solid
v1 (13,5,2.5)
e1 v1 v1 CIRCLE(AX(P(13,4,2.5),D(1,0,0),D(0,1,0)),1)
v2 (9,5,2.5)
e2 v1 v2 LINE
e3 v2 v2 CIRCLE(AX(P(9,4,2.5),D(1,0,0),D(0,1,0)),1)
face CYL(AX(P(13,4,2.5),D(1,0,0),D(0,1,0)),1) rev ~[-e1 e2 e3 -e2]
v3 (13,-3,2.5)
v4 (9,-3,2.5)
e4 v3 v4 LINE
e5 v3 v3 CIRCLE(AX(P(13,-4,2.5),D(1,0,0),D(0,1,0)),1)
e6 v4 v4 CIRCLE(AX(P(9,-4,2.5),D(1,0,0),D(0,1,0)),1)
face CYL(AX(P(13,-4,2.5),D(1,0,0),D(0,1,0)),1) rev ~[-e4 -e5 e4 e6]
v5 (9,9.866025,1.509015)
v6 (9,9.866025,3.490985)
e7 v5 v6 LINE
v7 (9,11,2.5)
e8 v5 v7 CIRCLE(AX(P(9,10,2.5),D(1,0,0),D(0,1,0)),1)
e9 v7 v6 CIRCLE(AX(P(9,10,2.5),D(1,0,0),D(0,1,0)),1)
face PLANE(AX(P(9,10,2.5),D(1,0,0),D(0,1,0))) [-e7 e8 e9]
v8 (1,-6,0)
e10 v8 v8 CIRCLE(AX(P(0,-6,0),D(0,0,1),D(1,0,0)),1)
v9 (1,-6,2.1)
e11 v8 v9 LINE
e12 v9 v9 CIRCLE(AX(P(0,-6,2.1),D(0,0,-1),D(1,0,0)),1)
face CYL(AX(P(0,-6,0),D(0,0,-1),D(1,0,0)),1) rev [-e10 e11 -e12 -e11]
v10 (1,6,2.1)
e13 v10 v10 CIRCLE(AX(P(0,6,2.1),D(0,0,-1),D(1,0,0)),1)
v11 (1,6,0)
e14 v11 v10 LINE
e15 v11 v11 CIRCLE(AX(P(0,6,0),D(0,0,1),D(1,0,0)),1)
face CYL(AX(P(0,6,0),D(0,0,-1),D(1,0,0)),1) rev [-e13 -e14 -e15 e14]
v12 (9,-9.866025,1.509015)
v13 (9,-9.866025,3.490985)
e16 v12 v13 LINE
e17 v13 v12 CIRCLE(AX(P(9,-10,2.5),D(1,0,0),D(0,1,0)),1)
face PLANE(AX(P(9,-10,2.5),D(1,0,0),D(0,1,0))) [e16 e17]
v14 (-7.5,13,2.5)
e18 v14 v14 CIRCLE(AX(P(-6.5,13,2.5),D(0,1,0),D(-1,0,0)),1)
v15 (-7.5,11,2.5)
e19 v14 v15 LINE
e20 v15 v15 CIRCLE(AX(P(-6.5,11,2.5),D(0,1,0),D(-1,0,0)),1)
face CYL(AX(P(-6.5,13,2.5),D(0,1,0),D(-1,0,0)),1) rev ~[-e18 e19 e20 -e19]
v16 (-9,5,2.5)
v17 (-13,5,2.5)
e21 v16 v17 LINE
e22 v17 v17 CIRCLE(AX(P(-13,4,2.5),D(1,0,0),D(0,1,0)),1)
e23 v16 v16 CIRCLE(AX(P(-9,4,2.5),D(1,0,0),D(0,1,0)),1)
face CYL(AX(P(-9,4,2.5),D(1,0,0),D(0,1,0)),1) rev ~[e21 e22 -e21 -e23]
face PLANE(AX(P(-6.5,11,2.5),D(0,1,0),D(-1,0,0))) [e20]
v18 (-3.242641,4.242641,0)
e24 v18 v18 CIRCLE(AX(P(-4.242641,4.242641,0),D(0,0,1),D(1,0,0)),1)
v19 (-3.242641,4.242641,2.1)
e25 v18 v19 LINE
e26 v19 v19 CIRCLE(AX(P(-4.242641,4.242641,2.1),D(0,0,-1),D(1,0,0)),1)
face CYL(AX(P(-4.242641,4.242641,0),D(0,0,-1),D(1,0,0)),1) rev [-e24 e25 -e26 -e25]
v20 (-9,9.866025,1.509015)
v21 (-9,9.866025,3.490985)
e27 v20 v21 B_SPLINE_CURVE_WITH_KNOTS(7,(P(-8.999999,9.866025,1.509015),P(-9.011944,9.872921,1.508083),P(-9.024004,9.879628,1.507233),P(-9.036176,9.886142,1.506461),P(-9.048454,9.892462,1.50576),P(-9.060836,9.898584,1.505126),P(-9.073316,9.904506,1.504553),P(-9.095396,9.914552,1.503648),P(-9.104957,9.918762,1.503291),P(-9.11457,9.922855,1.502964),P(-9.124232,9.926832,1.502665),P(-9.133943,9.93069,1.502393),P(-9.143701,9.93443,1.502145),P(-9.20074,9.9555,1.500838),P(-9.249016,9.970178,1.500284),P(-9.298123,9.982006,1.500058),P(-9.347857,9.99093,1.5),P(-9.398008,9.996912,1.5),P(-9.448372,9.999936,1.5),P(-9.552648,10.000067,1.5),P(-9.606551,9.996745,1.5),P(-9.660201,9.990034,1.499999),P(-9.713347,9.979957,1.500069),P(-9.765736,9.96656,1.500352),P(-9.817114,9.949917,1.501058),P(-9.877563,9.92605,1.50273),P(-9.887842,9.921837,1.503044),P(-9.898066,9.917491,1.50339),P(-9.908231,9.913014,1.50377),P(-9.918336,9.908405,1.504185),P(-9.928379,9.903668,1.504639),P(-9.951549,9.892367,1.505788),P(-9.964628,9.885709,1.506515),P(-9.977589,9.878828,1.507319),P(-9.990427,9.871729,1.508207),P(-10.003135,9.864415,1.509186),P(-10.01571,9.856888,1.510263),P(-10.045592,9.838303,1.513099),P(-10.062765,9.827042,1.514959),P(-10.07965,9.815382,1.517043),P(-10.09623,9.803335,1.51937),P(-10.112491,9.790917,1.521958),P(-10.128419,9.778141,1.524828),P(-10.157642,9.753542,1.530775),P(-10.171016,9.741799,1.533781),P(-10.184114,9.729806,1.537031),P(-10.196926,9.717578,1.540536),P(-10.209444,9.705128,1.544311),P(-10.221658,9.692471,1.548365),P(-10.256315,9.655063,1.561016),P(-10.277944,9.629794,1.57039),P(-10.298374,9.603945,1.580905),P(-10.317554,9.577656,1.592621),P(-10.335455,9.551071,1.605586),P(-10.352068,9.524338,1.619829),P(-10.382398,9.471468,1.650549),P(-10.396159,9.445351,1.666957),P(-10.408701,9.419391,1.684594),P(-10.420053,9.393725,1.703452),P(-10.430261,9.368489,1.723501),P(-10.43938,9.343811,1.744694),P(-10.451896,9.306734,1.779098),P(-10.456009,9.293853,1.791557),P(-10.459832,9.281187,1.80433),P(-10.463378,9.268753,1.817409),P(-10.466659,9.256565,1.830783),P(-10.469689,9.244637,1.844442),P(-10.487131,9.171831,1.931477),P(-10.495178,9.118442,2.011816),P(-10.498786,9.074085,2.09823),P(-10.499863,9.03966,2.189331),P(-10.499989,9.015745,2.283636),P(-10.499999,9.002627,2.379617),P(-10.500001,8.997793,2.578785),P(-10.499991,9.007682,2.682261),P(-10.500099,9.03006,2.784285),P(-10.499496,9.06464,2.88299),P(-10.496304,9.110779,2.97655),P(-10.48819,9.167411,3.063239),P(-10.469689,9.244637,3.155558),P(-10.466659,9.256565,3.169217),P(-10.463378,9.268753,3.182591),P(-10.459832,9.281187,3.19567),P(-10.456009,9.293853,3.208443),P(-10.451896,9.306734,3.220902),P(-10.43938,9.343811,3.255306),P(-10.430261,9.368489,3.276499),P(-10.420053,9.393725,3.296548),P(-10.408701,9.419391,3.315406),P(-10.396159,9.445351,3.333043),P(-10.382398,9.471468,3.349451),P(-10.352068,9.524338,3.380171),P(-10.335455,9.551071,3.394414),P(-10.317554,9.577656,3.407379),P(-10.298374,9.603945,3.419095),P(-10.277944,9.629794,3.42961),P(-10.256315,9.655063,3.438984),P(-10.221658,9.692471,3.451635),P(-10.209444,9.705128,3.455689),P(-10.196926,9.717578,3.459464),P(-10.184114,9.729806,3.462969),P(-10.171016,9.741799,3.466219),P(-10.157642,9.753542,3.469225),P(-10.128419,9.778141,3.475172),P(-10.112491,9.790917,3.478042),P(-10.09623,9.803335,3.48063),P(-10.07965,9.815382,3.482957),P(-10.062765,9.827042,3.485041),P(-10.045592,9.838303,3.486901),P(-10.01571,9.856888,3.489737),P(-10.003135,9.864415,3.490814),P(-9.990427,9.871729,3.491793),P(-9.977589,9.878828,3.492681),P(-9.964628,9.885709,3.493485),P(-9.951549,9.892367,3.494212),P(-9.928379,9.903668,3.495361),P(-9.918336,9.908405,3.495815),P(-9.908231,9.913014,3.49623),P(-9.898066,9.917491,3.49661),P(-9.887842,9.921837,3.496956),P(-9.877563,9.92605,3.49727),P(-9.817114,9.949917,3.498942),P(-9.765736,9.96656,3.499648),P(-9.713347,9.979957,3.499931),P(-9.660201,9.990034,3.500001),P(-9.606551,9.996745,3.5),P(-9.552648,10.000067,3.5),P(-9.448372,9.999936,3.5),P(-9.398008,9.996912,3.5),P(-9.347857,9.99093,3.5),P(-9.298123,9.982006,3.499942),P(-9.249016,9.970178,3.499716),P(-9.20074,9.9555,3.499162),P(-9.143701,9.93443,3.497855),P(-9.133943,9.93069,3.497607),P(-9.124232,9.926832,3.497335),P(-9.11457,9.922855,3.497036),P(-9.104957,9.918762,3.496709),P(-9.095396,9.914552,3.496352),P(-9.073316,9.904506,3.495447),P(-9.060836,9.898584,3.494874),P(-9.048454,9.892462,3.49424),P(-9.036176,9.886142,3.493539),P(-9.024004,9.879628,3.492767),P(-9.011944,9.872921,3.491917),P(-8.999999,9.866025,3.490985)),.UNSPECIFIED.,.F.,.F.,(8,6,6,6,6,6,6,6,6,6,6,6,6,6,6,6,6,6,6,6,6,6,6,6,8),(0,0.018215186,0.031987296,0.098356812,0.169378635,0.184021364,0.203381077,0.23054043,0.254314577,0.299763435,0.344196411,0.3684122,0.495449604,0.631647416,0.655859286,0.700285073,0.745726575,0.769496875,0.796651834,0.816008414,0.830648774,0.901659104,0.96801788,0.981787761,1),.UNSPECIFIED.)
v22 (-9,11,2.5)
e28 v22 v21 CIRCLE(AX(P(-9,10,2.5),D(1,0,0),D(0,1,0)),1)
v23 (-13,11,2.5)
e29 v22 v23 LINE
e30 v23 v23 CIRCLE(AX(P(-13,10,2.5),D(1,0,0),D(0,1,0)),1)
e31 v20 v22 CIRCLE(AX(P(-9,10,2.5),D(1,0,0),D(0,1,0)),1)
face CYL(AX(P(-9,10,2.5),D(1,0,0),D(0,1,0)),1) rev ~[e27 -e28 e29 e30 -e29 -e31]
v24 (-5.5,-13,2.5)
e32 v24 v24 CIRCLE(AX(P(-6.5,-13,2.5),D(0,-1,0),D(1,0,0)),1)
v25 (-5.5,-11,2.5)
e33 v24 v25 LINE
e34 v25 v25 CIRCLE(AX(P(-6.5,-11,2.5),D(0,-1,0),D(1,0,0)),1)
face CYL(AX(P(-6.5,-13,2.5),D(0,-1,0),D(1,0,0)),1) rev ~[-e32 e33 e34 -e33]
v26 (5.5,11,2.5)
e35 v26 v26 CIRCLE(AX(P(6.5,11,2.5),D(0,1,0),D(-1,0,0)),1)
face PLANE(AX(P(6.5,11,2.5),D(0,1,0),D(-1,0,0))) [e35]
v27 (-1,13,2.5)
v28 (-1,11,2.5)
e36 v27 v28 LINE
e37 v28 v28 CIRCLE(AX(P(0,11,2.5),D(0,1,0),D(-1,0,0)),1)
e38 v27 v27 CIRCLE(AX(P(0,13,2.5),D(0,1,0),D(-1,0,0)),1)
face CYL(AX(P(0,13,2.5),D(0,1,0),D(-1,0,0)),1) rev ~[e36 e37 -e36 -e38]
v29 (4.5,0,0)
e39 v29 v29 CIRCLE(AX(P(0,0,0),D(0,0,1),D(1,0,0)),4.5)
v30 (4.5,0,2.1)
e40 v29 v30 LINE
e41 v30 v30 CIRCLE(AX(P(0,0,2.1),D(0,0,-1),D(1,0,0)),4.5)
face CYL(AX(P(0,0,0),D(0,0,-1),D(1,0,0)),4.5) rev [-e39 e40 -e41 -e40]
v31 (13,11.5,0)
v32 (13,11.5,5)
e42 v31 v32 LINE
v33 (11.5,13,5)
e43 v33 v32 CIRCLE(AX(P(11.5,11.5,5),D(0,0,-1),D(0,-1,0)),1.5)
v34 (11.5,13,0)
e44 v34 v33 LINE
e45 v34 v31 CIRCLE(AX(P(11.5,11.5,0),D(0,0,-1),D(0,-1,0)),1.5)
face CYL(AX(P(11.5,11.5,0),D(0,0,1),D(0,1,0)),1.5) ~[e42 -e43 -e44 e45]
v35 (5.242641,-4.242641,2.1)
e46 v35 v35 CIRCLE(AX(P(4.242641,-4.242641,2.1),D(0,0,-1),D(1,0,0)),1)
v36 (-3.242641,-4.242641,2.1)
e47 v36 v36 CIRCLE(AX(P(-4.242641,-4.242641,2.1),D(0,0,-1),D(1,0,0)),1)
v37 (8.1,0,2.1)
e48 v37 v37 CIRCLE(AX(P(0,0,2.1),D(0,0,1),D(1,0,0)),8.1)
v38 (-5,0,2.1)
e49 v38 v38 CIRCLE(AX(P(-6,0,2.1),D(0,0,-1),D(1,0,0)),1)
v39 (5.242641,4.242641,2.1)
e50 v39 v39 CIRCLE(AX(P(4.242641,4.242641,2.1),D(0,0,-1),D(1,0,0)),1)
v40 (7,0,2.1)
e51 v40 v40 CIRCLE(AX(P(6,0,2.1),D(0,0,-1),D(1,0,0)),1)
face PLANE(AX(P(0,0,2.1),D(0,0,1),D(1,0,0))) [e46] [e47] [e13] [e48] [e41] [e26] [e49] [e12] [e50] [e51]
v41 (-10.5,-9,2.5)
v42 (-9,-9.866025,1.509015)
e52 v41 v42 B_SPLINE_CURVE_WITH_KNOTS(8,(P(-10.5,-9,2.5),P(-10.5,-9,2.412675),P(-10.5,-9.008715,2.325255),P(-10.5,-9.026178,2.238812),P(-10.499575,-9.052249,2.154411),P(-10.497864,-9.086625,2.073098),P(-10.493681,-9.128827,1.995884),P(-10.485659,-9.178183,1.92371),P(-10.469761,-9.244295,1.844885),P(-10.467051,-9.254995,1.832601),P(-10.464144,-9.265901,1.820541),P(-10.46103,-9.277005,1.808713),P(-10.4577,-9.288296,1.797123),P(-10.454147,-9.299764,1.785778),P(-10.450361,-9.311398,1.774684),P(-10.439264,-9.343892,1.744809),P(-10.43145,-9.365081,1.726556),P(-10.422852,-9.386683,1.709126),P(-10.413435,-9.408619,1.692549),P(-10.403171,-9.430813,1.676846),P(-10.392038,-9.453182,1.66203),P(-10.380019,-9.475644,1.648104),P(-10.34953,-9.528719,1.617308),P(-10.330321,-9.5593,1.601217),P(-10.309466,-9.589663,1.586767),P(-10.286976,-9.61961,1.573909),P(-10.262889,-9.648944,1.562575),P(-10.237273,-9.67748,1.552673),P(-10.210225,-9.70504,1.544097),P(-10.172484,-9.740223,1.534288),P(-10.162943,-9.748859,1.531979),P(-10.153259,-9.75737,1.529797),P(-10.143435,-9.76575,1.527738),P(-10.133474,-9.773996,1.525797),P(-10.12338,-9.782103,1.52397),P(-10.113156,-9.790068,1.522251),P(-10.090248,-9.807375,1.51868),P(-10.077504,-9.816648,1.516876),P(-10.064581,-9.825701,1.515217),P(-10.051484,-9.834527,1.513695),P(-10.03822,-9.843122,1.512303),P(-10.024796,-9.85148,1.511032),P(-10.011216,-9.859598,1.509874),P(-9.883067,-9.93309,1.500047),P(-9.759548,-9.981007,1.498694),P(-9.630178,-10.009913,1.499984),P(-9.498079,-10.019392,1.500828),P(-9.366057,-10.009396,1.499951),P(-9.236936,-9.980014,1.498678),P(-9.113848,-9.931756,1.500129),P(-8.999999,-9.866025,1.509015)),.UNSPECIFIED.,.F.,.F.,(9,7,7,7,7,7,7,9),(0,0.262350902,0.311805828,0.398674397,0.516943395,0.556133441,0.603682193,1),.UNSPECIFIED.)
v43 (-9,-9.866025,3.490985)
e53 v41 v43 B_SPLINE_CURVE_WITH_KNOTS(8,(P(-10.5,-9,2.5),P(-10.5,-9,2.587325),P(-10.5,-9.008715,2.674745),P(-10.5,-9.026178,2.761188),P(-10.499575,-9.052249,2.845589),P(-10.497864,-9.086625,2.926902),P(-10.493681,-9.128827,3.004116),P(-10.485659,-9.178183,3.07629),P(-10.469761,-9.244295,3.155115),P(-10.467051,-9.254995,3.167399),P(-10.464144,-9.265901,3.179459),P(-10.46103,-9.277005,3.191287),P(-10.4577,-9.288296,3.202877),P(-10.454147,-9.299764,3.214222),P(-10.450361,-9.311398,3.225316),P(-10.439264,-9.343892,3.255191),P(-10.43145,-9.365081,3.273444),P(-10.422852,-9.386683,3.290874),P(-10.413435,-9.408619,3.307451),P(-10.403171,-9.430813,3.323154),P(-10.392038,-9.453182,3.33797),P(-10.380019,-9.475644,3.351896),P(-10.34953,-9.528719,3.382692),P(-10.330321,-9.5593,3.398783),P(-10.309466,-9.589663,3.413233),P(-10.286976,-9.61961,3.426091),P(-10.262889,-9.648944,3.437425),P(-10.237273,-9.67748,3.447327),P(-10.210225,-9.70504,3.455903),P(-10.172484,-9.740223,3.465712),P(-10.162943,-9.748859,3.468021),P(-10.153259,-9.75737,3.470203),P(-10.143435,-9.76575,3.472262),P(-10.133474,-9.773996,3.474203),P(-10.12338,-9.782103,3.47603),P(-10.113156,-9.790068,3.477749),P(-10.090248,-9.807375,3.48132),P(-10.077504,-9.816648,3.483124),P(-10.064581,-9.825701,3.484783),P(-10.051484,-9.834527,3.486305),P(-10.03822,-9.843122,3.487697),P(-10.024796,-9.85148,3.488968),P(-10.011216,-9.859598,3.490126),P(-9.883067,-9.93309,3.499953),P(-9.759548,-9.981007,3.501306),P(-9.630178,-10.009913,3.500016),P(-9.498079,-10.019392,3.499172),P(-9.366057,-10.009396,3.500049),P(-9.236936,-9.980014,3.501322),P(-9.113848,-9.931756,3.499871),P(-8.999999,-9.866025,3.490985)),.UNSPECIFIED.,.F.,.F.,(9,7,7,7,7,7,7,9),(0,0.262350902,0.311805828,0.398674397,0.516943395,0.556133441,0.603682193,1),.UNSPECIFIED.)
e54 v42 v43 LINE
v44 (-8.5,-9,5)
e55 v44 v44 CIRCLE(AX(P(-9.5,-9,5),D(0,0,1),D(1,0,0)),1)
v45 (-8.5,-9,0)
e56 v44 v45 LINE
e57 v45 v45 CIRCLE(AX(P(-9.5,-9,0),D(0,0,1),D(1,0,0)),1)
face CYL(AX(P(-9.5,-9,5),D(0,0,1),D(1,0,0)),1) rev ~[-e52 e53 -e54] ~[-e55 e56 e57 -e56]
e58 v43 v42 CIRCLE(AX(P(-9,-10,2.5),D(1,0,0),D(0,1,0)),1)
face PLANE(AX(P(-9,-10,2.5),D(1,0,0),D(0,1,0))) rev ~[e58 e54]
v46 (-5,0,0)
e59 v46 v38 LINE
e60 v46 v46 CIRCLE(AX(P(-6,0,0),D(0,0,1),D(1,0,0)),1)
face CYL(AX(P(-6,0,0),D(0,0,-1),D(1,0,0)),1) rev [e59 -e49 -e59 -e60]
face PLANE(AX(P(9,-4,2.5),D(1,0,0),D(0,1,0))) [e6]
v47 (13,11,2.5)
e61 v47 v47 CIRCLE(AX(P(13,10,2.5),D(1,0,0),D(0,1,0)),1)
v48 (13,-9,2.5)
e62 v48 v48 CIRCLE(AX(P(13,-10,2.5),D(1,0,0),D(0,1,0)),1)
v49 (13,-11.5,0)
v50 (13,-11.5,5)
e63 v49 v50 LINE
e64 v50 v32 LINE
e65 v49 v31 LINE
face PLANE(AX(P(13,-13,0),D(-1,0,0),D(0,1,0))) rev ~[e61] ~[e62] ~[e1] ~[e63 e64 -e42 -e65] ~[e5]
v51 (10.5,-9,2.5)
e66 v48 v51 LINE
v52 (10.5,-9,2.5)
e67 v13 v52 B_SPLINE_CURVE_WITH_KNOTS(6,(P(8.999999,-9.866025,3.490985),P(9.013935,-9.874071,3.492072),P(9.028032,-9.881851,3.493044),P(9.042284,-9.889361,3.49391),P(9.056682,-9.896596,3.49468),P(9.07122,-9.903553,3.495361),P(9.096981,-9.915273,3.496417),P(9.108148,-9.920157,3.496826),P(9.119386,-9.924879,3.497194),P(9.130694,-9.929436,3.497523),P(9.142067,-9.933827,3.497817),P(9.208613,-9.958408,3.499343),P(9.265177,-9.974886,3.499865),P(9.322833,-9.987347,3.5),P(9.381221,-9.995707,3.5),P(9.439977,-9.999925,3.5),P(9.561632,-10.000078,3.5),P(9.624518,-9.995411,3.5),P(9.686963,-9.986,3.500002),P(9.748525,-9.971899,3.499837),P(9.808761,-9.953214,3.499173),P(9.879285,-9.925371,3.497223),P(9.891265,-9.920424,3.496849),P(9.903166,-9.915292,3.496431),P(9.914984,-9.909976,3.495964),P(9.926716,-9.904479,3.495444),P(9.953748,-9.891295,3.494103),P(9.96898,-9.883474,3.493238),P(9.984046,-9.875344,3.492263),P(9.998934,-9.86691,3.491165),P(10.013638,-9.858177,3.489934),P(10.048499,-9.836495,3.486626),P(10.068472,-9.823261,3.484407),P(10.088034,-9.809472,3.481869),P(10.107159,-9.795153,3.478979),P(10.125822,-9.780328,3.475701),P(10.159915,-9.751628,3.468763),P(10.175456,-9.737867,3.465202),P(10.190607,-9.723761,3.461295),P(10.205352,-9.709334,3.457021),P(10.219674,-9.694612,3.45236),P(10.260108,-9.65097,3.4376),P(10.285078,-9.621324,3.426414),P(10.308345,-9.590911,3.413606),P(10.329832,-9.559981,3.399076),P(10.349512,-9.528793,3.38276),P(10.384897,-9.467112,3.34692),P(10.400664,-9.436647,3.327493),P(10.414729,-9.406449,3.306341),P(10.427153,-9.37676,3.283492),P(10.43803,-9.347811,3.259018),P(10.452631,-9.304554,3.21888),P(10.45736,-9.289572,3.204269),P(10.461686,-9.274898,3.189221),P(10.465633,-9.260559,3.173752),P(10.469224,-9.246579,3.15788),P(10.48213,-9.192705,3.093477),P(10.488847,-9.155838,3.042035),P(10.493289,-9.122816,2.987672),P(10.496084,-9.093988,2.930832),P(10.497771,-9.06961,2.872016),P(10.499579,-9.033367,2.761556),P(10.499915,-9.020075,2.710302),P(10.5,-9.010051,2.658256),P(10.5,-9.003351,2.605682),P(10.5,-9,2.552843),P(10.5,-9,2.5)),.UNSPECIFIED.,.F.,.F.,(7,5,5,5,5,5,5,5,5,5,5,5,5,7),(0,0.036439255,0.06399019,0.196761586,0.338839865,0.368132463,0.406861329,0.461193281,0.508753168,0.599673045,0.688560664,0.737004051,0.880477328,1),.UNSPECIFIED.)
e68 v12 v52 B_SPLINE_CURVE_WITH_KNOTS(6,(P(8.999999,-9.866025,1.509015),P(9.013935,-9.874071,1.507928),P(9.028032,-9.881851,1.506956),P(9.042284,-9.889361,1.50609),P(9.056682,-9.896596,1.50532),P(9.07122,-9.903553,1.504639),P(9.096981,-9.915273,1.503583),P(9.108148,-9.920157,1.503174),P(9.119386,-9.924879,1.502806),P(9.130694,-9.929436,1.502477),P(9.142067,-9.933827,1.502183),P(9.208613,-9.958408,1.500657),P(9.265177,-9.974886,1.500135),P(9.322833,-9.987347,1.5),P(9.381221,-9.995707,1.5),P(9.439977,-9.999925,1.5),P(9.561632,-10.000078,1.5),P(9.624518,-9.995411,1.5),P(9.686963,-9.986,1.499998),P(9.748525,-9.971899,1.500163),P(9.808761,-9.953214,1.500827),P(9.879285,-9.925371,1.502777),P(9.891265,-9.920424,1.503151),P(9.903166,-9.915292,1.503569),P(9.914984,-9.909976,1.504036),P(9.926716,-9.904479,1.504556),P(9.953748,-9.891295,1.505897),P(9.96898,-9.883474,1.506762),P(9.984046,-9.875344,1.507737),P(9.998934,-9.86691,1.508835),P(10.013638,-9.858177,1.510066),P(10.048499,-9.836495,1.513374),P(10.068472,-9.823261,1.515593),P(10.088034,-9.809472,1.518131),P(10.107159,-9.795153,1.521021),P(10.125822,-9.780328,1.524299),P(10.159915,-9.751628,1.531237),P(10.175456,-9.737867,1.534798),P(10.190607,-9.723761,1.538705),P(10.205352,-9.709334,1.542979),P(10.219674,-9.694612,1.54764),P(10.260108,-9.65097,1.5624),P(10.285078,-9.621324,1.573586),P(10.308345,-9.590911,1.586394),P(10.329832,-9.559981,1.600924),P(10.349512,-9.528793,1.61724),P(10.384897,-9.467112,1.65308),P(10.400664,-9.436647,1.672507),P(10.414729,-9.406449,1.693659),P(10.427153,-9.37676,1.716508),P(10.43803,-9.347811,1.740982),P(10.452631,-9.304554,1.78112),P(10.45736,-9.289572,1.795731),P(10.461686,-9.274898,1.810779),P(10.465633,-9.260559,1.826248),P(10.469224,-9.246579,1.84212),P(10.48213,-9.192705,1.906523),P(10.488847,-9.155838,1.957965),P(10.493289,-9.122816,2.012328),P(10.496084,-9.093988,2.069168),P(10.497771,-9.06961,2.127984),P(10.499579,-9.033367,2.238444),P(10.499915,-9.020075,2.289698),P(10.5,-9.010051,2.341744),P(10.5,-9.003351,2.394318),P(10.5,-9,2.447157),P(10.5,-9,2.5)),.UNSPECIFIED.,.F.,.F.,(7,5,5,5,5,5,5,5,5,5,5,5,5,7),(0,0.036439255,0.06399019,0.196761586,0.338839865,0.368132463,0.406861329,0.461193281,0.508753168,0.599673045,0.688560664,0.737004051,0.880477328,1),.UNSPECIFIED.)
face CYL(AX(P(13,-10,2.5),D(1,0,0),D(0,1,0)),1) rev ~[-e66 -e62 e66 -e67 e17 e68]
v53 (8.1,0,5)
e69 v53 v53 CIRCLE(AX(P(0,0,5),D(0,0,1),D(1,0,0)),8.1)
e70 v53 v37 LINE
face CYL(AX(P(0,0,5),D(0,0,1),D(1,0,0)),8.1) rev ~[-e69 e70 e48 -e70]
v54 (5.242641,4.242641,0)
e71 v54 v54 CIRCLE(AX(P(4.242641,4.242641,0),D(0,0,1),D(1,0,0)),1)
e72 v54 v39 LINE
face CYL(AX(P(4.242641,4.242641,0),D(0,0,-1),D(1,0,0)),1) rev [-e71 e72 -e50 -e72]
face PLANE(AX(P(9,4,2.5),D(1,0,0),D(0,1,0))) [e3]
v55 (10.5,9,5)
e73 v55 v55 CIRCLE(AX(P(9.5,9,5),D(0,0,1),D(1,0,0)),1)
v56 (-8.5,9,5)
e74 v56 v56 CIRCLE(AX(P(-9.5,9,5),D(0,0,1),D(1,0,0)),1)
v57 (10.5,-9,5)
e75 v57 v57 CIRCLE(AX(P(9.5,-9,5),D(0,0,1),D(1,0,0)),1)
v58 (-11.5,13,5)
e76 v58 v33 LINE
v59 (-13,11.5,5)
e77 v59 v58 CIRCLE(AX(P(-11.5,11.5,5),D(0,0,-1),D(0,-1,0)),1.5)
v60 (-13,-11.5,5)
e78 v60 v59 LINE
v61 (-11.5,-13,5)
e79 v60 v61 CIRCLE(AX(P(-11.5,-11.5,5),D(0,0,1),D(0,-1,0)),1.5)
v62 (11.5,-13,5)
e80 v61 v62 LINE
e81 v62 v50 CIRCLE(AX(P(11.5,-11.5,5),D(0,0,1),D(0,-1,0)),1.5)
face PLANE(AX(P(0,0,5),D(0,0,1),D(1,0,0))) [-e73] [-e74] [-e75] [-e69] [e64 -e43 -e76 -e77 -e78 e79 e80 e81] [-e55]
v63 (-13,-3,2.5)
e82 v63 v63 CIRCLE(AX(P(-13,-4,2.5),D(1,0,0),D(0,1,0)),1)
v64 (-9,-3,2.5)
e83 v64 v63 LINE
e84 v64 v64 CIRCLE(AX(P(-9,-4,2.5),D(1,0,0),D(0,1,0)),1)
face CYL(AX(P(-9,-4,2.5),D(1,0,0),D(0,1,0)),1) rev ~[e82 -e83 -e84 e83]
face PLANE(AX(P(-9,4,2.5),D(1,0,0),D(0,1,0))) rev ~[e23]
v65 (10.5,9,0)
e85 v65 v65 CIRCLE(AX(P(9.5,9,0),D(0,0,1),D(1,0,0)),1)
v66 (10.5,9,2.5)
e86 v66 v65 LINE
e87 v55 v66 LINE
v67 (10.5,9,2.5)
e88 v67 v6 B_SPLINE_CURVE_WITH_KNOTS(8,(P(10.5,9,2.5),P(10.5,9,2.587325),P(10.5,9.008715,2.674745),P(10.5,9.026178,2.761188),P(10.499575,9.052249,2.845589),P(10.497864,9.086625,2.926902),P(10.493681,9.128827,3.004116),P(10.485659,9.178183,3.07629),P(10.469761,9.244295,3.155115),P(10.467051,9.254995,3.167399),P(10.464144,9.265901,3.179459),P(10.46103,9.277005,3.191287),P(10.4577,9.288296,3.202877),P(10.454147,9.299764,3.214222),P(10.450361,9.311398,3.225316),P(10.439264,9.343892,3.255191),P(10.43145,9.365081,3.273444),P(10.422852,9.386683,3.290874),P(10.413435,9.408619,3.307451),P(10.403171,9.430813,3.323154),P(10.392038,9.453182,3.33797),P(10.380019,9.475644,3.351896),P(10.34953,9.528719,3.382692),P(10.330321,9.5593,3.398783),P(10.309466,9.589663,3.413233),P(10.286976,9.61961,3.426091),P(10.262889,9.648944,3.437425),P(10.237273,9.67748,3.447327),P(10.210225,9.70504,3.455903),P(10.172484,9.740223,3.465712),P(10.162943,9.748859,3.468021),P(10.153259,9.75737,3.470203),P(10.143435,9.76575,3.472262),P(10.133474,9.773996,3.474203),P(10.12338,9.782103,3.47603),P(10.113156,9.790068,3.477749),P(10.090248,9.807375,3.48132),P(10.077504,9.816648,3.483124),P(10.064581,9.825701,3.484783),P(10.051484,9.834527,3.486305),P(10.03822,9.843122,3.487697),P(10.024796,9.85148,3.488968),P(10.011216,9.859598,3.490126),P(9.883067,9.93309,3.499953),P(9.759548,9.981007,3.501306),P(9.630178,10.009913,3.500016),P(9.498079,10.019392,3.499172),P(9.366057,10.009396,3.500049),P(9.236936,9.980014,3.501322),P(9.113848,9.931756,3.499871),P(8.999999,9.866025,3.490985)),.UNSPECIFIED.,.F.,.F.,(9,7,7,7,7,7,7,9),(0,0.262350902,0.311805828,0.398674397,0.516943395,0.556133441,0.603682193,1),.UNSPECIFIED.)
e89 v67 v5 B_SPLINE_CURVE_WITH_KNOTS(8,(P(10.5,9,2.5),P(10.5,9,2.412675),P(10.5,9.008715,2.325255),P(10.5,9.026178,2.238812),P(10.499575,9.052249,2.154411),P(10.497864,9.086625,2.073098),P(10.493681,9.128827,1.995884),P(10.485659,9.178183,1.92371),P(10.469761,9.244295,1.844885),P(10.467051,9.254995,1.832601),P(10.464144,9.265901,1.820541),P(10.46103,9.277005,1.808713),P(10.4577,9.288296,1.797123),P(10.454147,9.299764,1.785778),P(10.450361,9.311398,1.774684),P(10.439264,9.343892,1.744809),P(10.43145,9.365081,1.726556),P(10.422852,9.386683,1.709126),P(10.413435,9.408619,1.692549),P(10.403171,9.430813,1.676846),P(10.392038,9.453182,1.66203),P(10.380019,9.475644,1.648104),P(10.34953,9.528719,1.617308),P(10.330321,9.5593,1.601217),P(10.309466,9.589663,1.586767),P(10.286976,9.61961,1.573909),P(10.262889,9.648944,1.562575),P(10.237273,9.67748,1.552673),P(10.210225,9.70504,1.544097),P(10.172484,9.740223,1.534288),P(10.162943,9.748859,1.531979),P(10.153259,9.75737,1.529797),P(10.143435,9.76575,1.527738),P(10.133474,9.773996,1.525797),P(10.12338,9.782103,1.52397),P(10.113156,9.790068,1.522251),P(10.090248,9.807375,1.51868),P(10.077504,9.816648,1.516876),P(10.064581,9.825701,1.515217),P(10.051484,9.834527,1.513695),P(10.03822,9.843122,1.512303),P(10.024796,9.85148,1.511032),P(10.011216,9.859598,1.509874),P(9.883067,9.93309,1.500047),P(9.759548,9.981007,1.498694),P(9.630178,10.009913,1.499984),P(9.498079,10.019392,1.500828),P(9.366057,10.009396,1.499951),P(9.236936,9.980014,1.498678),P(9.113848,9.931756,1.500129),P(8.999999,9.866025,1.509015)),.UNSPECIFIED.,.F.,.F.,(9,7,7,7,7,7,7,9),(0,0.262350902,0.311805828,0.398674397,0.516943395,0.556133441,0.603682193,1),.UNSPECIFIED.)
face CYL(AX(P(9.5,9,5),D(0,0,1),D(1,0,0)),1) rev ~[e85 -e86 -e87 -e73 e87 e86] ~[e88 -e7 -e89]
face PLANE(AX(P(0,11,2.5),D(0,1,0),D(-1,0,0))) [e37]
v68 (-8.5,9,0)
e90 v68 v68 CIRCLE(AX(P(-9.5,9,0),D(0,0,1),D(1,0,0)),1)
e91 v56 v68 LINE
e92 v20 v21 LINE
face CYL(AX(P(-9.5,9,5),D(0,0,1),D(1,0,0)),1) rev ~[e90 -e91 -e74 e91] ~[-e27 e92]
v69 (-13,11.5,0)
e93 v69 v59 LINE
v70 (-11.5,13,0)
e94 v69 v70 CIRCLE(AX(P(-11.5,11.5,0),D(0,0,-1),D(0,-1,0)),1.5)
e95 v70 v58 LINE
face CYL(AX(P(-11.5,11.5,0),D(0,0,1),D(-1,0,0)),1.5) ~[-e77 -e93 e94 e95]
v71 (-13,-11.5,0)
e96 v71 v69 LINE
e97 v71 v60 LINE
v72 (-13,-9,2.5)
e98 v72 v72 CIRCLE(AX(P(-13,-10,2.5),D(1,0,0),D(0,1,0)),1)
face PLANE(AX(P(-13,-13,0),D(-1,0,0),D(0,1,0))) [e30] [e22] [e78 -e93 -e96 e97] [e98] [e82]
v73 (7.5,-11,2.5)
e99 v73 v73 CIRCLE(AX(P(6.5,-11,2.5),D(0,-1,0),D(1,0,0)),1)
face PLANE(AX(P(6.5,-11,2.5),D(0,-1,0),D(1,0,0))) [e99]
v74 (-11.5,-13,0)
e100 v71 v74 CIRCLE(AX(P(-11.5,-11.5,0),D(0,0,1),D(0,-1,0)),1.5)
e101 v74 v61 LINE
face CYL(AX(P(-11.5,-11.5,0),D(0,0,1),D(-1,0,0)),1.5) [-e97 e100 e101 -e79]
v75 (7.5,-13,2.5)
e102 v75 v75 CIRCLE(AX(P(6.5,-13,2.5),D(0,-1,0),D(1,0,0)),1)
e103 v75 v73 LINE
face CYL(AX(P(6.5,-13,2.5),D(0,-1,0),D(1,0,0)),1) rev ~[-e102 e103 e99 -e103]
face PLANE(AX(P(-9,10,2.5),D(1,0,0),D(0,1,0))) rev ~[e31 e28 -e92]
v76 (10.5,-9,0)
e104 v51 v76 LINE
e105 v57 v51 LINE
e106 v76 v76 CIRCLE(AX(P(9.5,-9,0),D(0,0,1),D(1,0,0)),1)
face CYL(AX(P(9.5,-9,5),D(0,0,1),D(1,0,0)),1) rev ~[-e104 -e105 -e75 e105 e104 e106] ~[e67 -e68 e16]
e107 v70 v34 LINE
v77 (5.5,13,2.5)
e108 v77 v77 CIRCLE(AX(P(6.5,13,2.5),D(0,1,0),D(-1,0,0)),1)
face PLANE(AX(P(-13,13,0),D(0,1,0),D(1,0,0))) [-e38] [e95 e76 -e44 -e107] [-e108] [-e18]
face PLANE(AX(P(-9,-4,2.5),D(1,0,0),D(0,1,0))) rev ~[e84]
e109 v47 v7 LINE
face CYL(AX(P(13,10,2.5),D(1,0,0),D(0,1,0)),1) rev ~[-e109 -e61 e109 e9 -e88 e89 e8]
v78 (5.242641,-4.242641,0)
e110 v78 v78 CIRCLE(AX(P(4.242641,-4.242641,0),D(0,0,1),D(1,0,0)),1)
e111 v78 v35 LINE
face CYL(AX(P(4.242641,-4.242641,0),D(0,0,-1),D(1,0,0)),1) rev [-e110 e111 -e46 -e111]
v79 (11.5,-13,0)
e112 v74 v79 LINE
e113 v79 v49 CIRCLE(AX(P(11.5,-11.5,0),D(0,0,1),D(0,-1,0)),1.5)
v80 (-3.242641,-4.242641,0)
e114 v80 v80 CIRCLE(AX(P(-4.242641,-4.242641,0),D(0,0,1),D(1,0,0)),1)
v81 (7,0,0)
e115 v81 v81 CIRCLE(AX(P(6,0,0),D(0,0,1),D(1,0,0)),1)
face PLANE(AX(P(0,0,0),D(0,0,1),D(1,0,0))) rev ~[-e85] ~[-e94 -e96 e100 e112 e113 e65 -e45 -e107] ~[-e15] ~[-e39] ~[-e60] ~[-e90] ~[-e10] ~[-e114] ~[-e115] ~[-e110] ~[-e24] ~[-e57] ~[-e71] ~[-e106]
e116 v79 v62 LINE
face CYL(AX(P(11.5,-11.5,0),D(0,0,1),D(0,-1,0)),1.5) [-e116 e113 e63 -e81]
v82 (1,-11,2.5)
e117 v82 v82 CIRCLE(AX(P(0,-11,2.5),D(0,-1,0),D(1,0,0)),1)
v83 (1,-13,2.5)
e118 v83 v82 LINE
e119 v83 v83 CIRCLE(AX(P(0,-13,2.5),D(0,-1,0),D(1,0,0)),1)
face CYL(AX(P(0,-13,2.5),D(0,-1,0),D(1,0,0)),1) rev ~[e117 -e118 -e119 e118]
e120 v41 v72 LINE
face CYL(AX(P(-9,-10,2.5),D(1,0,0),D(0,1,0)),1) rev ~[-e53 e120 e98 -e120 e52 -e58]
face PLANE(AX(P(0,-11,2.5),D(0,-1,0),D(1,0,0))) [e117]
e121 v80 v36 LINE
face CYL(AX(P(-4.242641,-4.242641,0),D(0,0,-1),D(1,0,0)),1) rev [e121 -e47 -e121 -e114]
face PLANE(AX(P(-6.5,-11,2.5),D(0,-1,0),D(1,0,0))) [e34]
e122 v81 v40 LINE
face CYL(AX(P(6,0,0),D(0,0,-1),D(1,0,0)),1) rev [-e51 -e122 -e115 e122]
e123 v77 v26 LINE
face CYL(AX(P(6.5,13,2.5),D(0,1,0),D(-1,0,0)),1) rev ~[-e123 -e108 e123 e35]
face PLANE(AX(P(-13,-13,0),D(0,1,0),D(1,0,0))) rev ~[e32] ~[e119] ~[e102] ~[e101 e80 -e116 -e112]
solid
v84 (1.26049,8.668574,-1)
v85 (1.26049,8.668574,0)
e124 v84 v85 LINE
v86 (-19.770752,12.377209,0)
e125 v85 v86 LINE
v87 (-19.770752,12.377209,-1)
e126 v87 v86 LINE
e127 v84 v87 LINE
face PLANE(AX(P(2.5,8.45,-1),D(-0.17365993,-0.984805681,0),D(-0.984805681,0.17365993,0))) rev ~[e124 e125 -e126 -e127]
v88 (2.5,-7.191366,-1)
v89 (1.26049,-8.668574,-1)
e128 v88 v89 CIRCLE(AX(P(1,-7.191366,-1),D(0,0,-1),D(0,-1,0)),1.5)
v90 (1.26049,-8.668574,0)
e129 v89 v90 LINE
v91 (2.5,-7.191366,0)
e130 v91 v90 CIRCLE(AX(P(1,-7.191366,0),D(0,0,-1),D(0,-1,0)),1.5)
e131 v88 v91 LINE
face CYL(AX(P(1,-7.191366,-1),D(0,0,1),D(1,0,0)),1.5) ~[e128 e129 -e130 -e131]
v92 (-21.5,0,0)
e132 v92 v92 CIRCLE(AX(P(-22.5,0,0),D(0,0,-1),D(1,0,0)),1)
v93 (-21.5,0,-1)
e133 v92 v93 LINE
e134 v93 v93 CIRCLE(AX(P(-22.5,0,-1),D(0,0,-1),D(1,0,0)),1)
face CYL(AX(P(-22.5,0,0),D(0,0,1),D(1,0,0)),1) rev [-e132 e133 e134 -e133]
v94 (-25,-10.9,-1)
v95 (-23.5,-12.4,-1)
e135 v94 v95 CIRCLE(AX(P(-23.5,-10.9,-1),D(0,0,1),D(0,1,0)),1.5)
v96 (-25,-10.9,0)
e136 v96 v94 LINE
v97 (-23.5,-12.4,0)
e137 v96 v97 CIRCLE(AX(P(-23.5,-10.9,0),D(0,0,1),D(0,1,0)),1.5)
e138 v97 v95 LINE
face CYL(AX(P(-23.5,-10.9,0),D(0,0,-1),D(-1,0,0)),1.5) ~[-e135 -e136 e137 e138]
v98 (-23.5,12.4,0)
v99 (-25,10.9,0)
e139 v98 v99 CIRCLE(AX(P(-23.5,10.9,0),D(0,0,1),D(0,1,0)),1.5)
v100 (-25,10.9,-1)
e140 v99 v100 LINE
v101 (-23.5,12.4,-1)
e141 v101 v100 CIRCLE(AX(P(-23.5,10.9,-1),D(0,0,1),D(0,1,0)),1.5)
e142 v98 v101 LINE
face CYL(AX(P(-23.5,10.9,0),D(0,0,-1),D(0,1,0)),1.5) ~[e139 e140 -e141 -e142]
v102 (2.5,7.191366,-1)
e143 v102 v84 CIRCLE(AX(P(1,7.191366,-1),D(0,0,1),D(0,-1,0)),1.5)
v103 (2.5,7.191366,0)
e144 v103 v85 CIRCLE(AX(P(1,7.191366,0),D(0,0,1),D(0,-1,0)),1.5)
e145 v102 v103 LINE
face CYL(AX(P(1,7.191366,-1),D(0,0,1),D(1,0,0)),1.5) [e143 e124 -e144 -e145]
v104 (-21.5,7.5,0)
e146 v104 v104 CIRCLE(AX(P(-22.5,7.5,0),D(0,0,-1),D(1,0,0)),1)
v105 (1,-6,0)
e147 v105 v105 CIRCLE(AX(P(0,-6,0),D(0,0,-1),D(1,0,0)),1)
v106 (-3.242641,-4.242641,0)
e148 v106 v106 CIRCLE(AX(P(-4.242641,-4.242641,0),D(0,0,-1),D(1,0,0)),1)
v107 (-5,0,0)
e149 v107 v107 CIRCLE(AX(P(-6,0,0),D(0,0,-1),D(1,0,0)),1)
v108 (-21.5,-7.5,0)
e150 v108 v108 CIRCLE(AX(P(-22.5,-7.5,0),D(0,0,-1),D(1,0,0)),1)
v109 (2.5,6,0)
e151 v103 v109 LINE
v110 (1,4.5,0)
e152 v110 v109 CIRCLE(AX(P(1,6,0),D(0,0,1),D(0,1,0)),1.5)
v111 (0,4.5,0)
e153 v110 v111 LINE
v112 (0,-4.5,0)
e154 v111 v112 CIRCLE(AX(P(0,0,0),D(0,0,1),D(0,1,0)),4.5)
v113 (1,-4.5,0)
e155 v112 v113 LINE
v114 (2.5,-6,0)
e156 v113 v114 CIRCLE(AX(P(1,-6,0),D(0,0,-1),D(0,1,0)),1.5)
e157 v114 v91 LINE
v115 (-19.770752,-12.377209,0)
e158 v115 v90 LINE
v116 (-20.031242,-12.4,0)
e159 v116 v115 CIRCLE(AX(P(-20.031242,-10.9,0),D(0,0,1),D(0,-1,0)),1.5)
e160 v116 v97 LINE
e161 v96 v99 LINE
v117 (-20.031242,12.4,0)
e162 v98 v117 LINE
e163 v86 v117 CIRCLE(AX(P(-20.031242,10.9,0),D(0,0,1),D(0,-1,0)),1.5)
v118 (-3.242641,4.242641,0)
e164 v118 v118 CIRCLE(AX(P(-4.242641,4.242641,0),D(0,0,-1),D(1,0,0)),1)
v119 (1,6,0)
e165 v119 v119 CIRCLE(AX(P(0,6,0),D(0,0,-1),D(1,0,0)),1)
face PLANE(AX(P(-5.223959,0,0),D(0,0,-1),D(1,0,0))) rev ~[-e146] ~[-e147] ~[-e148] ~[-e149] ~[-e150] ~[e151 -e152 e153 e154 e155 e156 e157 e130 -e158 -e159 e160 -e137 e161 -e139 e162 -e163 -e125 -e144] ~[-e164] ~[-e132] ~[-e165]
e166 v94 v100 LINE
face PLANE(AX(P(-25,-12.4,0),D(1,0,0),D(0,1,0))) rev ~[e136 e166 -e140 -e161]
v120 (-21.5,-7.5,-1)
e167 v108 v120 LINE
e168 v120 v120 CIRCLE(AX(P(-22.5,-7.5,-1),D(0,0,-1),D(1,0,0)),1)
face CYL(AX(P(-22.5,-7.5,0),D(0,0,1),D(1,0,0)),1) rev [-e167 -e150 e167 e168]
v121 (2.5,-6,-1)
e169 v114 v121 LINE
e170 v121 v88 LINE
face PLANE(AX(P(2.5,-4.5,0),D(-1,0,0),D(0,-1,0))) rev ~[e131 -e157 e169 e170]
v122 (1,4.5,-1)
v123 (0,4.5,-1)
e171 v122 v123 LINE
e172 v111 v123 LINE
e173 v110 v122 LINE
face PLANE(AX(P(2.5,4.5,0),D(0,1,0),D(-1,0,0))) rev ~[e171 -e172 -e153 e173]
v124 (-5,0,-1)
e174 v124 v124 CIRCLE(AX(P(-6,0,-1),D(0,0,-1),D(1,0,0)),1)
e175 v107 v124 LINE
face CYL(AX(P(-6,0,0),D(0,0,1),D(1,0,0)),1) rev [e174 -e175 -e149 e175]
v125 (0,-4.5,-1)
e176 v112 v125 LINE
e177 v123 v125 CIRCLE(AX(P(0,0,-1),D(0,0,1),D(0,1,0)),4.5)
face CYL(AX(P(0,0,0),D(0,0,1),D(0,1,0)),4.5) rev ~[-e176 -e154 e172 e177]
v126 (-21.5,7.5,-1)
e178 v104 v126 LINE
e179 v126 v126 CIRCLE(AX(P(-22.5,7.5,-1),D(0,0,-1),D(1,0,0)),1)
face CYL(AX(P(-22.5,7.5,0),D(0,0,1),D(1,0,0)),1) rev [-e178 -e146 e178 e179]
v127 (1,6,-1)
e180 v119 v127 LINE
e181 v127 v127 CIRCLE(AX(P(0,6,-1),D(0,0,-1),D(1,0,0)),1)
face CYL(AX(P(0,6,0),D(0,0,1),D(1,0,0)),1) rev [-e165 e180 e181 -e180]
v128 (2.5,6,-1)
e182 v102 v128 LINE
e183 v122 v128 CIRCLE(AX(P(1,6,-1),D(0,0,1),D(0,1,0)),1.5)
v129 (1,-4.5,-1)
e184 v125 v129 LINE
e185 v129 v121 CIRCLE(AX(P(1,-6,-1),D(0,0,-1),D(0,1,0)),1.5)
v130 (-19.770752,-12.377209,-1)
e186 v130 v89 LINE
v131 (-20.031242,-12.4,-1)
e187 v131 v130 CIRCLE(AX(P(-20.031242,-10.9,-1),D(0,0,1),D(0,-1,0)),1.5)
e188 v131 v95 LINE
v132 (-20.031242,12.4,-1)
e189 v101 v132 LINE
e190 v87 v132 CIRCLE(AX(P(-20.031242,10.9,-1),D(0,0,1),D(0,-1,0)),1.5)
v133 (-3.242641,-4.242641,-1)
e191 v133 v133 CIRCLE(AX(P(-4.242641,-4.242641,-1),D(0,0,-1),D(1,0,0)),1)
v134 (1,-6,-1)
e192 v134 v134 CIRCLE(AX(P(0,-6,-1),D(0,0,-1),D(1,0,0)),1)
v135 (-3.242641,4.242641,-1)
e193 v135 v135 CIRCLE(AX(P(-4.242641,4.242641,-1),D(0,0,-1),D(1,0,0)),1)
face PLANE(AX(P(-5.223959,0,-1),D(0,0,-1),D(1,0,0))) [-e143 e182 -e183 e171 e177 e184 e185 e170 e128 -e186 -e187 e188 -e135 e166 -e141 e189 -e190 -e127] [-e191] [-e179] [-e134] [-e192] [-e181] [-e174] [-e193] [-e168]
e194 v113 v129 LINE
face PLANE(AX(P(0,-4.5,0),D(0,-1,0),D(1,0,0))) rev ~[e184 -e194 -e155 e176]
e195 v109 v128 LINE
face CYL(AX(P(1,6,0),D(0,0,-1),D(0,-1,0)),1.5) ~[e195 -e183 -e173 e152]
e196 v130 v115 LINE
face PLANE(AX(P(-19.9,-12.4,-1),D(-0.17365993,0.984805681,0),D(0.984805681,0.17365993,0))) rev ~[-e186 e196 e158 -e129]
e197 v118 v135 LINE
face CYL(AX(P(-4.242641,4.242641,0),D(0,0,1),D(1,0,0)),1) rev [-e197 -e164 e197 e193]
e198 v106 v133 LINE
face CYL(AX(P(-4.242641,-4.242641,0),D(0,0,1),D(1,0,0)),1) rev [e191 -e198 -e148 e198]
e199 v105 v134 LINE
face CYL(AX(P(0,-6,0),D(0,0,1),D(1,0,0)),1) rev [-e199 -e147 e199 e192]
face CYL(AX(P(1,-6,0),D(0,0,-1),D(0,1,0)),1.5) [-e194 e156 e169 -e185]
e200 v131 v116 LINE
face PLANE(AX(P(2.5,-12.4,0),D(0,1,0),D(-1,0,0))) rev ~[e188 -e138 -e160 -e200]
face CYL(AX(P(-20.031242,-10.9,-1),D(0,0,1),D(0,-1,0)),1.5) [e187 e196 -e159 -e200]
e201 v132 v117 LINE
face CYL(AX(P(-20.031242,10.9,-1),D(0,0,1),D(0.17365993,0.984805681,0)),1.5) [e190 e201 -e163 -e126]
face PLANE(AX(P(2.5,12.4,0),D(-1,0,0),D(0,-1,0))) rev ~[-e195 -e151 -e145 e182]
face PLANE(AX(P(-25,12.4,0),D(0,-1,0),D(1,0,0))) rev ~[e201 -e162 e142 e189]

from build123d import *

# Parameters (mm, degrees)
F0_W             = 26
F0_H             = 26
F0_R             = 1
F0_R_2           = 4.5
F1_DEPTH         = 5
F2_R             = 1
F3_DEPTH         = 2
F4_R             = 8.1
F5_DEPTH         = 2.9
F6_R             = 1
F7_DEPTH         = 2
F8_R             = 1.5
F9_R             = 1
F10_DEPTH        = 5
F11_R            = 1
F12_DEPTH        = 1
F14_DEPTH        = 1
F15_R            = 1.5
F16_R            = 1
F17_DEPTH        = 4
F17_COPIES_COUNT = 2
F17_COPIES_PITCH = 22


# Not quite as in the source:
# - a pattern or mirror of a feature is missing from the dataset's text; its kind, count and spacing are read off the source's solid


with BuildPart() as f1:
    # F0 (on Top) → F1 (new body)
    with BuildSketch(Plane.XY):
        Rectangle(F0_W, F0_H)
        with Locations((-4.2426406871, -4.2426406871)):
            Circle(F0_R, mode=Mode.SUBTRACT)
        with Locations((0, -6)):
            Circle(F0_R, mode=Mode.SUBTRACT)
        with Locations((4.2426406871, -4.2426406871)):
            Circle(F0_R, mode=Mode.SUBTRACT)
        with Locations((-6, 0)):
            Circle(F0_R, mode=Mode.SUBTRACT)
        with Locations((-4.2426406871, 4.2426406871)):
            Circle(F0_R, mode=Mode.SUBTRACT)
        Circle(F0_R_2, mode=Mode.SUBTRACT)
        with Locations((6, 0)):
            Circle(F0_R, mode=Mode.SUBTRACT)
        with Locations((0, 6)):
            Circle(F0_R, mode=Mode.SUBTRACT)
        with Locations((4.2426406871, 4.2426406871)):
            Circle(F0_R, mode=Mode.SUBTRACT)
    extrude(amount=F1_DEPTH)

    # F2 (on face) → F3 (cut)
    with BuildSketch(Plane.XZ.offset(13)):
        with Locations((0, 2.5)):
            Circle(F2_R)
        with Locations((-6.5, 2.5)):
            Circle(F2_R)
        with Locations((6.5, 2.5)):
            Circle(F2_R)
    extrude(amount=-F3_DEPTH, mode=Mode.SUBTRACT)

    # F4 (on face) → F5 (cut)
    with BuildSketch(Plane.XY.offset(5)):
        Circle(F4_R)
    extrude(amount=-F5_DEPTH, mode=Mode.SUBTRACT)

    # F6 (on face) → F7 (cut)
    with BuildSketch(Plane(origin=(0, 13, 0), x_dir=(-1, 0, 0), z_dir=(0, 1, 0))):
        with Locations((6.5, 2.5)):
            Circle(F6_R)
        with Locations((0, 2.5)):
            Circle(F6_R)
        with Locations((-6.5, 2.5)):
            Circle(F6_R)
    extrude(amount=-F7_DEPTH, mode=Mode.SUBTRACT)

    # F8
    f8_edges = [f1.edges().sort_by_distance(p)[0] for p in [
        (-13, -13, 2.5),
        (13, -13, 2.5),
        (-13, 13, 2.5),
        (13, 13, 2.5),
    ]]
    fillet(f8_edges, radius=F8_R)

    # F9 (on face) → F10 (cut, through all)
    with BuildSketch(Plane.XY.offset(5)):
        with Locations((-9.5, 9)):
            Circle(F9_R)
        with Locations((9.5, 9)):
            Circle(F9_R)
        with Locations((-9.5, -9)):
            Circle(F9_R)
        with Locations((9.5, -9)):
            Circle(F9_R)
    extrude(amount=-F10_DEPTH, mode=Mode.SUBTRACT)

    # F16 (on face) → F17 (cut)
    with BuildSketch(Plane.YZ.offset(13)):
        with Locations((-4, 2.5)):
            Circle(F16_R)
        with Locations((-10, 2.5)):
            Circle(F16_R)
        with Locations((4, 2.5)):
            Circle(F16_R)
        with Locations((10, 2.5)):
            Circle(F16_R)
    f17 = extrude(amount=-F17_DEPTH, mode=Mode.SUBTRACT)

    # F17_copies: F17 ×2
    with Locations(*[(-i * F17_COPIES_PITCH, 0, 0) for i in range(1, F17_COPIES_COUNT)]):
        add(f17, mode=Mode.SUBTRACT)


with BuildPart() as f12:
    # F11 (on face) → F12 (new body)
    with BuildSketch(Plane(origin=(0, 0, 0), x_dir=(1, 0, 0), z_dir=(0, 0, -1))):
        with BuildLine():
            ThreePointArc((0, -4.5), (-4.5, 0), (0, 4.5))
            Line((0, 4.5), (2.5, 4.5))
            Line((2.5, 4.5), (2.5, 12.4))
            Line((2.5, 12.4), (-12.7, 12.4))
            ThreePointArc((-12.7, 12.4), (-12.9230249471, 11.974341649), (-13, 11.5))
            Line((-13, 11.5), (-13, -11.5))
            ThreePointArc((-13, -11.5), (-12.9230249471, -11.974341649), (-12.7, -12.4))
            Line((-12.7, -12.4), (2.5, -12.4))
            Line((2.5, -12.4), (2.5, -4.5))
            Line((2.5, -4.5), (0, -4.5))
        make_face()
        with Locations((-9.5, -9)):
            Circle(F11_R, mode=Mode.SUBTRACT)
        with Locations((-4.2426406871, -4.2426406871)):
            Circle(F11_R, mode=Mode.SUBTRACT)
        with Locations((0, -6)):
            Circle(F11_R, mode=Mode.SUBTRACT)
        with Locations((-9.5, 9)):
            Circle(F11_R, mode=Mode.SUBTRACT)
        with Locations((-6, 0)):
            Circle(F11_R, mode=Mode.SUBTRACT)
        with Locations((-4.2426406871, 4.2426406871)):
            Circle(F11_R, mode=Mode.SUBTRACT)
        with Locations((0, 6)):
            Circle(F11_R, mode=Mode.SUBTRACT)
        with BuildLine():
            ThreePointArc((-13, 11.5), (-12.9230249471, 11.974341649), (-12.7, 12.4))
            Line((-12.7, 12.4), (-25, 12.4))
            Line((-25, 12.4), (-25, -12.4))
            Line((-25, -12.4), (-12.7, -12.4))
            ThreePointArc((-12.7, -12.4), (-12.9230249471, -11.974341649), (-13, -11.5))
            Line((-13, -11.5), (-13, 11.5))
        make_face()
        with Locations((-22.5, -7.5)):
            Circle(F11_R, mode=Mode.SUBTRACT)
        with Locations((-22.5, 0)):
            Circle(F11_R, mode=Mode.SUBTRACT)
        with Locations((-22.5, 7.5)):
            Circle(F11_R, mode=Mode.SUBTRACT)
        with Locations((-9.5, 9)):
            Circle(F11_R)
        with Locations((-9.5, -9)):
            Circle(F11_R)
    extrude(amount=F12_DEPTH)

    # F13 (on face) → F14 (cut, through all)
    with BuildSketch(Plane(origin=(0, 0, -1), x_dir=(1, 0, 0), z_dir=(0, 0, -1))):
        Polygon((-19.9, 12.4), (2.5, 8.45), (2.5, 12.4), align=None)
        Polygon((-19.9, -12.4), (2.5, -12.4), (2.5, -8.45), align=None)
    extrude(amount=-F14_DEPTH, mode=Mode.SUBTRACT)

    # F15
    f15_edges = [f12.edges().sort_by_distance(p)[0] for p in [
        (2.5, -8.45, -0.5),
        (-19.9, -12.4, -0.5),
        (-25, -12.4, -0.5),
        (2.5, 4.5, -0.5),
        (2.5, -4.5, -0.5),
        (2.5, 8.45, -0.5),
        (-19.9, 12.4, -0.5),
        (-25, 12.4, -0.5),
    ]]
    fillet(f15_edges, radius=F15_R)


solid = Compound([f1.part, f12.part])
